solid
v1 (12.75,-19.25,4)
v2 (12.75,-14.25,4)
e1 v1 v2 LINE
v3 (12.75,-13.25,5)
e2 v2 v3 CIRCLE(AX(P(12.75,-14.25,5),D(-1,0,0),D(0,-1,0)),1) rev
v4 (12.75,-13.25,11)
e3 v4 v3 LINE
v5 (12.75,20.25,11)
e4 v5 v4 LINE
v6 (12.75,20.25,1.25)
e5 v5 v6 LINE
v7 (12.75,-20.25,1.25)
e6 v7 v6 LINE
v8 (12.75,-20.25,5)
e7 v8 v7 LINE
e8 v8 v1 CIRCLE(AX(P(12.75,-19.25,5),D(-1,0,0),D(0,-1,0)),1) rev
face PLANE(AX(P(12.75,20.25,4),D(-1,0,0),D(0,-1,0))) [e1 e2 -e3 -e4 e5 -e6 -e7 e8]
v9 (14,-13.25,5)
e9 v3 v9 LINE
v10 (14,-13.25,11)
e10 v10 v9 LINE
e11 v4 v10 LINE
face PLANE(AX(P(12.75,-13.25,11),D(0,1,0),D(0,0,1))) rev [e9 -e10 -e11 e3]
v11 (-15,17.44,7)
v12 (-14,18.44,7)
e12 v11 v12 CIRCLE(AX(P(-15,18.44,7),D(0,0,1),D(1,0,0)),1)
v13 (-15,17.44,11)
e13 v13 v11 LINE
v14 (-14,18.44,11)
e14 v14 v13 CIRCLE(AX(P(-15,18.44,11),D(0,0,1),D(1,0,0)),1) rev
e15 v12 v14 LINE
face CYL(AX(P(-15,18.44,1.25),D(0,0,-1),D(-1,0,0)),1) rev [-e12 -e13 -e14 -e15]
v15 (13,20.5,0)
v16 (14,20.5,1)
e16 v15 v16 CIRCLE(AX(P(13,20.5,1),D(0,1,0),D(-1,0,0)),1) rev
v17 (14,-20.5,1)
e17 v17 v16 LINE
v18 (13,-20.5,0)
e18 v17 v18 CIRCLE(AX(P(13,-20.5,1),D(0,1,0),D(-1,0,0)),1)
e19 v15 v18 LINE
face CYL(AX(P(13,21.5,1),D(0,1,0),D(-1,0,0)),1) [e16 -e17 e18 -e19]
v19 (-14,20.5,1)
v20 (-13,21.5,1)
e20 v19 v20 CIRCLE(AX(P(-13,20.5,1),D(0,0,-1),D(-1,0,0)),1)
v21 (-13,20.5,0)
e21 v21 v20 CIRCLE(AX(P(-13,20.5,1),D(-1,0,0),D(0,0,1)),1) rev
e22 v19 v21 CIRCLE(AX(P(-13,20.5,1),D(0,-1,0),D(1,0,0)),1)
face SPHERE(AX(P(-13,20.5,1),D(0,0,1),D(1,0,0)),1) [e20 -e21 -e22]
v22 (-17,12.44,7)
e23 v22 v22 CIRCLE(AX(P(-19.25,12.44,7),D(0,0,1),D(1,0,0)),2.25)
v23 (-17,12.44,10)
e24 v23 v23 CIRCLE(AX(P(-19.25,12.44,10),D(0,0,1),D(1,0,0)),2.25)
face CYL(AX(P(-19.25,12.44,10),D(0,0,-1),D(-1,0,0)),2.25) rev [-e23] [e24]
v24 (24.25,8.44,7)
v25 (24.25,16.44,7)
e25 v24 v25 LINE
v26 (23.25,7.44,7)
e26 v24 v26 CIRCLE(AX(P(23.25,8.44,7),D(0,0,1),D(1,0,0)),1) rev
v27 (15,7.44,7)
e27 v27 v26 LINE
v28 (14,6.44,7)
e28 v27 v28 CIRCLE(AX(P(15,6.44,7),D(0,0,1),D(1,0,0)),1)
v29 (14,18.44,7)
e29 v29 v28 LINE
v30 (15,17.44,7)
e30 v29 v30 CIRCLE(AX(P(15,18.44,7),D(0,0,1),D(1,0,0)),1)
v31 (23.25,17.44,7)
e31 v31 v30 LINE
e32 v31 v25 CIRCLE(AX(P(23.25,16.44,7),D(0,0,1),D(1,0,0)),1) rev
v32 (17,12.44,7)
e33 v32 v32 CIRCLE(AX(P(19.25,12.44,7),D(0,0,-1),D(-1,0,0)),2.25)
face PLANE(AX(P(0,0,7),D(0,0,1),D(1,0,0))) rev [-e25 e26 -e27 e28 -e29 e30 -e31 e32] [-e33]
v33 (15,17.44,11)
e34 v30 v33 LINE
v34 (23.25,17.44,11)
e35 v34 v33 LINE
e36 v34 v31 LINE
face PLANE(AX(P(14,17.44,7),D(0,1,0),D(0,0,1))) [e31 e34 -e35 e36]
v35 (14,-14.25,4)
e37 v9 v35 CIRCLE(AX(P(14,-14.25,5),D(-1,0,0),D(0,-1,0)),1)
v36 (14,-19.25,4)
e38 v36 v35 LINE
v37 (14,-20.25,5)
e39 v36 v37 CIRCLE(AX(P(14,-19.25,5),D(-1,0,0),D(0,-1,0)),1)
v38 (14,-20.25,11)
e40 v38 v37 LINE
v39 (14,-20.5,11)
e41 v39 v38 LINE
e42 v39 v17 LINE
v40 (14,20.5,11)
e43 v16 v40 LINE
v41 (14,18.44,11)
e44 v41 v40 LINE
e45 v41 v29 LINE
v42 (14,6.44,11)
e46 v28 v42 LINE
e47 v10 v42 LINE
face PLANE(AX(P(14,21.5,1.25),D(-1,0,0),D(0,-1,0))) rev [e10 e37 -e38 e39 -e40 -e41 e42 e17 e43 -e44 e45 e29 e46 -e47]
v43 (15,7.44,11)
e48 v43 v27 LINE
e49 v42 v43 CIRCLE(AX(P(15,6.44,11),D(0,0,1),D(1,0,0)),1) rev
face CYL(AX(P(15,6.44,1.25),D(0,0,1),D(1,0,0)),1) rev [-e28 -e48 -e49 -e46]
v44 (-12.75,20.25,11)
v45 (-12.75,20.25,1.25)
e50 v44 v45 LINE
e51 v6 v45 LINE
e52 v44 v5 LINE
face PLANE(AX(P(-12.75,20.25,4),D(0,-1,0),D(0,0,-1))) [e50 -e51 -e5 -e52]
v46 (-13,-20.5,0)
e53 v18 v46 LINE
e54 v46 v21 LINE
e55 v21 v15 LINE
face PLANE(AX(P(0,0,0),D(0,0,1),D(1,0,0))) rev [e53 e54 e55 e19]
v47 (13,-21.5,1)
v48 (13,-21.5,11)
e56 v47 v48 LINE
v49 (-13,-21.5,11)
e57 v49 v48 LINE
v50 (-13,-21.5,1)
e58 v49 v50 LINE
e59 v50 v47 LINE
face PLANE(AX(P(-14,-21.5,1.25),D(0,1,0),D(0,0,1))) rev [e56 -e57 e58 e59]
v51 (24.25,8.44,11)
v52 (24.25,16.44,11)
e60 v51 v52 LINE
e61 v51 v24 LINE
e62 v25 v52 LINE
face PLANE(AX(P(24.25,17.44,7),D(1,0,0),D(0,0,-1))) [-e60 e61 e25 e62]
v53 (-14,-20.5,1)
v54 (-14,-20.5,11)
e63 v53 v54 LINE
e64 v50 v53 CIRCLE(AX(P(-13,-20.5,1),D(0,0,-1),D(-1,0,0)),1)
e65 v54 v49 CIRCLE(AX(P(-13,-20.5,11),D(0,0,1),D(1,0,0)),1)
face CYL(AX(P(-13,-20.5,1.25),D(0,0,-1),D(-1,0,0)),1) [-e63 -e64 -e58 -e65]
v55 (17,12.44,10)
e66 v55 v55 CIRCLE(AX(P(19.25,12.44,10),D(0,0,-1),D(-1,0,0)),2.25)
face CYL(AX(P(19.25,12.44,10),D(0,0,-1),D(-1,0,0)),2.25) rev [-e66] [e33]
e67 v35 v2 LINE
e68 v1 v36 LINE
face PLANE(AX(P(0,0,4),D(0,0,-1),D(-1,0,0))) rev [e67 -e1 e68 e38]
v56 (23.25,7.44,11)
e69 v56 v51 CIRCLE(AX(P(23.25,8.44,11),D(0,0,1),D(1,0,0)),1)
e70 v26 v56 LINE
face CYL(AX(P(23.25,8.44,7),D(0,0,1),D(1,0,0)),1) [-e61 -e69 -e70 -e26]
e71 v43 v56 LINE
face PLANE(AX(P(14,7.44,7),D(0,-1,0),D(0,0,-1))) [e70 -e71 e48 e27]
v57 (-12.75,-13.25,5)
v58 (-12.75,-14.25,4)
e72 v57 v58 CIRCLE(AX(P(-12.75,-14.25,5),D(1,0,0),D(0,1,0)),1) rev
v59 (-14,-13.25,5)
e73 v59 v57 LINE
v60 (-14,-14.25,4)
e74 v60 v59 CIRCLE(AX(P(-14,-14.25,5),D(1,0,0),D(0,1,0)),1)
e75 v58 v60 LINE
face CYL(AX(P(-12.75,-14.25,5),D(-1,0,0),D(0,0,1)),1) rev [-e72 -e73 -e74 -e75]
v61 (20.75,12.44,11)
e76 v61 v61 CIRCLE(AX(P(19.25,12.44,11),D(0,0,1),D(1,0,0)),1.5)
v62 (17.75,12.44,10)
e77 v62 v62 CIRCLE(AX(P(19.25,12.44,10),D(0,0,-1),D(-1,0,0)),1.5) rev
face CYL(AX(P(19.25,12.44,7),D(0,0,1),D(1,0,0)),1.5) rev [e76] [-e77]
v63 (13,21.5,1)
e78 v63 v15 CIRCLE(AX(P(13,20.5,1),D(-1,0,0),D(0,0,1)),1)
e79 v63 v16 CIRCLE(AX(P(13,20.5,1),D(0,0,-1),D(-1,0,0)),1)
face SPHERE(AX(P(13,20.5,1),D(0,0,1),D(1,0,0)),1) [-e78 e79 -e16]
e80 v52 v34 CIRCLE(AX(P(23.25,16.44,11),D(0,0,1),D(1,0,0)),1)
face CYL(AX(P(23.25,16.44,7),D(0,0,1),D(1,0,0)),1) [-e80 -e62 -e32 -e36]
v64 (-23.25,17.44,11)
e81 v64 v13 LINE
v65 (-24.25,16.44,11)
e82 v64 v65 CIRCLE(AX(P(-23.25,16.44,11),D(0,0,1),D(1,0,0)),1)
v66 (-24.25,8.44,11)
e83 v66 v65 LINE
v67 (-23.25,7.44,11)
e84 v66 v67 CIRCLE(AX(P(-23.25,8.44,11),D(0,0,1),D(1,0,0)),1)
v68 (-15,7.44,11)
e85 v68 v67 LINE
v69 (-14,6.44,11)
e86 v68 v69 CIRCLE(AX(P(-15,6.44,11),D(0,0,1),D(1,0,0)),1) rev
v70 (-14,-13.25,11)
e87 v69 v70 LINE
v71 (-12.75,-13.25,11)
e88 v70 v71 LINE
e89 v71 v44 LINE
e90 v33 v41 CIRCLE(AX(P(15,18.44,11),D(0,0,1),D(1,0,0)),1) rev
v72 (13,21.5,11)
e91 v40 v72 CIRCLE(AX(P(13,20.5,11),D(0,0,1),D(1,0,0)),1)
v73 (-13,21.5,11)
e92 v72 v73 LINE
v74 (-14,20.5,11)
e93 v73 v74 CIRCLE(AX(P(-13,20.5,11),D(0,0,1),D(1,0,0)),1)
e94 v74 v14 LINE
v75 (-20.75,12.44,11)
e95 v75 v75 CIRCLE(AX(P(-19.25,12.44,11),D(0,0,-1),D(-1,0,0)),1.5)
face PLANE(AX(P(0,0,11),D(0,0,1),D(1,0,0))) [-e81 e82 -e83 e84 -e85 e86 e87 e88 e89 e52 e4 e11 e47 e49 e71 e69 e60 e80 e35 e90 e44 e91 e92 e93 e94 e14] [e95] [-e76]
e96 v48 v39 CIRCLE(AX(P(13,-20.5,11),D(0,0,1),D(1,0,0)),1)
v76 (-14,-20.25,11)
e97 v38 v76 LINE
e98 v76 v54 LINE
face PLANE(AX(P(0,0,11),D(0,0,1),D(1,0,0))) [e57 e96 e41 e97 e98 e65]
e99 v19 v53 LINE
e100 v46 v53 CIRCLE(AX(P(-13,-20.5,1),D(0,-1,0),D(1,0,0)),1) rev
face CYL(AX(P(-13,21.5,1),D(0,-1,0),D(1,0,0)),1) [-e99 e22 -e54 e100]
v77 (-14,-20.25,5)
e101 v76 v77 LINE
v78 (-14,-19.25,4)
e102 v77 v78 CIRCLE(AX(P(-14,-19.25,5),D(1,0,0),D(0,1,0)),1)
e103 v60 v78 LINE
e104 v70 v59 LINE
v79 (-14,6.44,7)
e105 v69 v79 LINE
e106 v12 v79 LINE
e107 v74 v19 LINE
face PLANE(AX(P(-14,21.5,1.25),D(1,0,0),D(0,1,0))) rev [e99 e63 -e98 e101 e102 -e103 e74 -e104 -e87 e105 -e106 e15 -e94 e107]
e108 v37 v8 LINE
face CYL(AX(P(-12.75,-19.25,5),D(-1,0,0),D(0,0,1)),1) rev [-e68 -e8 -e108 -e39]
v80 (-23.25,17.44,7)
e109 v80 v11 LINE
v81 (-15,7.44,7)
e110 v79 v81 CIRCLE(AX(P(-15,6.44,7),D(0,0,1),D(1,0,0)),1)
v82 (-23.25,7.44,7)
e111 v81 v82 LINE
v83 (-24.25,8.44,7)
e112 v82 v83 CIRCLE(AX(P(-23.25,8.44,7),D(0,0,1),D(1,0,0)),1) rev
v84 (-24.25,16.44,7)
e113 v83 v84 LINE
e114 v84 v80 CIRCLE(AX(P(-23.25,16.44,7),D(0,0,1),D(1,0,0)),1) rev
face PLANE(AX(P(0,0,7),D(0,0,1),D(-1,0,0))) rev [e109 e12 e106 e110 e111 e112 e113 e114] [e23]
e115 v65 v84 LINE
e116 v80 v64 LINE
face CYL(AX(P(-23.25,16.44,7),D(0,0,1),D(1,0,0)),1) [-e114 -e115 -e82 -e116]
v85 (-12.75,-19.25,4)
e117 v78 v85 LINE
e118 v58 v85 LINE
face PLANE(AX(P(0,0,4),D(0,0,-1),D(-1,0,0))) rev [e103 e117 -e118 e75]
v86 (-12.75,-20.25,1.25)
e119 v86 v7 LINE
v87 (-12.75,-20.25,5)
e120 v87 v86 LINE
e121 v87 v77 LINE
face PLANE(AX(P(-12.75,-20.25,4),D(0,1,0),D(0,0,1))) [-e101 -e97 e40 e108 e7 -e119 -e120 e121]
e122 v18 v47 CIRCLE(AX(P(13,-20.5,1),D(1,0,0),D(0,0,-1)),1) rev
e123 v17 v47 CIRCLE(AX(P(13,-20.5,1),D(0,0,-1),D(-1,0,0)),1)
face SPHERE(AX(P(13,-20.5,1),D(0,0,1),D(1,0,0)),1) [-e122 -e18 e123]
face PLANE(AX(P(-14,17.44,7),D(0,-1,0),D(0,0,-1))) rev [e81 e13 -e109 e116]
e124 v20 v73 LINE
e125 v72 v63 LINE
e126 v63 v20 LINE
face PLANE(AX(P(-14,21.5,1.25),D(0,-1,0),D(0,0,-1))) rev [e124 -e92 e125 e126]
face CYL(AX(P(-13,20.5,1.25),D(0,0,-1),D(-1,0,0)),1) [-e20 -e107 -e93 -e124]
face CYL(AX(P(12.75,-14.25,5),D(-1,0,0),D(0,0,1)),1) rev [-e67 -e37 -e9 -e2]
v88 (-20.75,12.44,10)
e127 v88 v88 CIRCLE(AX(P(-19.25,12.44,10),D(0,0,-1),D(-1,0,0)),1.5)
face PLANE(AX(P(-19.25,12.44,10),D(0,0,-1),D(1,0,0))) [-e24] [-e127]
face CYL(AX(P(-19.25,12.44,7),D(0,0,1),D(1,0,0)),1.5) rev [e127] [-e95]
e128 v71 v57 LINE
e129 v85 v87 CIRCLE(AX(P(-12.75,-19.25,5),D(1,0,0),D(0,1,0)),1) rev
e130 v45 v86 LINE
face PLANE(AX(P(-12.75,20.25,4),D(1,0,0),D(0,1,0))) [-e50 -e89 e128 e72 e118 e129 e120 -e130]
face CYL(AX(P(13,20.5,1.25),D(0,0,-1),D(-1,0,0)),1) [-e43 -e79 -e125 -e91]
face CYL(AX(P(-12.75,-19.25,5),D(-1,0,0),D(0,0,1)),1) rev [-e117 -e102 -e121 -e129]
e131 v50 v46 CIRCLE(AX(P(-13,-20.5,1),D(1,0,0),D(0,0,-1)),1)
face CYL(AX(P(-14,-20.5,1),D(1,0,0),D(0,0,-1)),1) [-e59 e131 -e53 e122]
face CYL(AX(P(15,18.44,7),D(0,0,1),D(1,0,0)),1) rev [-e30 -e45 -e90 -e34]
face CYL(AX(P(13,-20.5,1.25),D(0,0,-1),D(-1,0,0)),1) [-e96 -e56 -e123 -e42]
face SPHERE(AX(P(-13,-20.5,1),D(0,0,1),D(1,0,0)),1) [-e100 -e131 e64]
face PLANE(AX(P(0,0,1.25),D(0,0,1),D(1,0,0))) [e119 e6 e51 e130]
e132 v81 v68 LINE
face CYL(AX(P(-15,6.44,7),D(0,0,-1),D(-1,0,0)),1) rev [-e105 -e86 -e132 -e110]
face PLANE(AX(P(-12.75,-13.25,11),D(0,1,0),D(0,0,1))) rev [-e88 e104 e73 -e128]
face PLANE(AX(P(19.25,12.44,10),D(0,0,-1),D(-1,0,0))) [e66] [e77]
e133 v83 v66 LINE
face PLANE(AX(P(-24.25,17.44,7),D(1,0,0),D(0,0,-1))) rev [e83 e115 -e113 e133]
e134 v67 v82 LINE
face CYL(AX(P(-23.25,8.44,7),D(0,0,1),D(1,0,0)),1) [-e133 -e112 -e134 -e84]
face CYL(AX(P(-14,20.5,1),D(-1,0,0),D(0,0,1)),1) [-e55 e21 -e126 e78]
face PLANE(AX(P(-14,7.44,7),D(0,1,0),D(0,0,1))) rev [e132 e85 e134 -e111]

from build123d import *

# Parameters (mm, degrees)
SKETCH1_W             = 28
SKETCH1_H             = 43
BOSS_EXTRUDE1_DEPTH   = 1.25
SKETCH2_W             = 28
SKETCH2_H             = 43
SKETCH2_W_2           = 25.5
SKETCH2_H_2           = 40.5
BOSS_EXTRUDE2_DEPTH   = 2.75
SKETCH4_W             = 28
SKETCH4_H             = 1.25
BOSS_EXTRUDE3_DEPTH   = 7
SKETCH12_W            = 10.25
SKETCH12_H            = 10
SKETCH12_R            = 1.5
BOSS_EXTRUDE5_DEPTH   = 4
FILLET3_R             = 1
SKETCH13_R            = 2.25
CUT_EXTRUDE2_DEPTH    = 3
MIRROR1_START         = 7
MIRROR1_OUTLINE_R     = 2.25
MIRROR1_DEPTH         = 4
MIRROR1_START_2       = 10
MIRROR1_2_OUTLINE_R   = 2.25
MIRROR1_2_OUTLINE_R_2 = 1.5
MIRROR1_2_DEPTH       = 1
FILLET4_R             = 1
FILLET5_R             = 1
FILLET6_R             = 1
FILLET7_R             = 1


# Read off the part's stored shape, not the designer's step: Mirror1
with BuildPart() as part:
    # Sketch1 → Boss-Extrude1 (new body)
    with BuildSketch(Plane.XY):
        Rectangle(SKETCH1_W, SKETCH1_H)
    extrude(amount=BOSS_EXTRUDE1_DEPTH)

    # Sketch2 → Boss-Extrude2 (add)
    with BuildSketch(Plane.XY.offset(1.25)):
        Rectangle(SKETCH2_W, SKETCH2_H)
        Rectangle(SKETCH2_W_2, SKETCH2_H_2, mode=Mode.SUBTRACT)
    extrude(amount=BOSS_EXTRUDE2_DEPTH)

    # Sketch4 → Boss-Extrude3 (add)
    with BuildSketch(Plane.XY.offset(4)):
        with Locations((0, -20.875)):
            Rectangle(SKETCH4_W, SKETCH4_H)
        Polygon((12.75, -13.25), (12.75, 20.25), (-12.75, 20.25), (-12.75, -13.25), (-14, -13.25), (-14, 21.5), (14, 21.5), (14, -13.25), align=None)
    extrude(amount=BOSS_EXTRUDE3_DEPTH)

    # Sketch12 → Boss-Extrude5 (add)
    with BuildSketch(Plane.XY.offset(11)):
        with Locations((19.125, 12.44)):
            Rectangle(SKETCH12_W, SKETCH12_H)
        with Locations((19.25, 12.44)):
            Circle(SKETCH12_R, mode=Mode.SUBTRACT)
    extrude(amount=-BOSS_EXTRUDE5_DEPTH)

    # Fillet3
    fillet3_edges = [part.edges().sort_by_distance(p)[0] for p in [
        (14, 7.44, 9),
        (14, 17.44, 9),
        (24.25, 17.44, 9),
        (24.25, 7.44, 9),
    ]]
    fillet(fillet3_edges, radius=FILLET3_R)

    # Sketch13 → Cut-Extrude2 (cut)
    with BuildSketch(Plane(origin=(0, 0, 7), x_dir=(-1, 0, 0), z_dir=(0, 0, -1))):
        with Locations((-19.25, 12.44)):
            Circle(SKETCH13_R)
    extrude(amount=-CUT_EXTRUDE2_DEPTH, mode=Mode.SUBTRACT)

    # Mirror1 outline → Mirror1 (add)
    with BuildSketch(Plane.XY.offset(MIRROR1_START)):
        with BuildLine():
            Line((-14, 17.44), (-23.25, 17.44))
            ThreePointArc((-23.25, 17.44), (-23.957106781, 17.147106781), (-24.25, 16.44))
            Line((-24.25, 16.44), (-24.25, 8.44))
            ThreePointArc((-24.25, 8.44), (-23.957106781, 7.732893219), (-23.25, 7.44))
            Line((-23.25, 7.44), (-14, 7.44))
            Line((-14, 7.44), (-14, 17.44))
        make_face()
        with Locations((-19.25, 12.44)):
            Circle(MIRROR1_OUTLINE_R, mode=Mode.SUBTRACT)
    extrude(amount=MIRROR1_DEPTH)

    # Mirror1 2 outline → Mirror1 2 (add)
    with BuildSketch(Plane.XY.offset(MIRROR1_START_2)):
        with Locations((-19.25, 12.44)):
            Circle(MIRROR1_2_OUTLINE_R)
        with Locations((-19.25, 12.44)):
            Circle(MIRROR1_2_OUTLINE_R_2, mode=Mode.SUBTRACT)
    extrude(amount=MIRROR1_2_DEPTH)

    # Fillet4
    fillet4_edges = [part.edges().sort_by_distance(p)[0] for p in [
        (-13.375, -20.25, 4),
        (13.375, -13.25, 4),
        (-13.375, -13.25, 4),
        (13.375, -20.25, 4),
    ]]
    fillet(fillet4_edges, radius=FILLET4_R)

    # Fillet5
    fillet5_edges = [part.edges().sort_by_distance(p)[0] for p in [
        (0, 21.5, 0),
        (14, 0, 0),
        (0, -21.5, 0),
        (-14, 0, 0),
    ]]
    fillet(fillet5_edges, radius=FILLET5_R)

    # Fillet6
    # the kernel refuses this fillet: 1 mm, written as the material it takes off along each edge
    with BuildSketch(Plane(origin=(13, -20.5, 1), x_dir=(0, -1, 0), z_dir=(1, 0, 0))) as fillet6_piece_1_section:
        Polygon((0, 0), (FILLET6_R, 0), (FILLET6_R, FILLET6_R), (0, FILLET6_R), align=None)
    fillet6_piece_1 = extrude(amount=FILLET6_R, mode=Mode.PRIVATE)
    fillet6_piece_1 = fillet6_piece_1 - Plane(origin=(13, -20.5, 1), x_dir=(0, 0.7071067811865475, 0.7071067811865475), z_dir=(1, 0, 0)) * Sphere(FILLET6_R, mode=Mode.PRIVATE)
    add(fillet6_piece_1, mode=Mode.SUBTRACT)
    with BuildSketch(Plane(origin=(-13, -20.5, 1), x_dir=(-1, 0, 0), z_dir=(0, -1, 0))) as fillet6_piece_2_section:
        Polygon((0, 0), (FILLET6_R, 0), (FILLET6_R, FILLET6_R), (0, FILLET6_R), align=None)
    fillet6_piece_2 = extrude(amount=FILLET6_R, mode=Mode.PRIVATE)
    fillet6_piece_2 = fillet6_piece_2 - Plane(origin=(-13, -20.5, 1), x_dir=(0.7071067811865475, 0, 0.7071067811865475), z_dir=(0, -1, 0)) * Sphere(FILLET6_R, mode=Mode.PRIVATE)
    add(fillet6_piece_2, mode=Mode.SUBTRACT)
    with BuildSketch(Plane(origin=(13, 20.5, 1), x_dir=(0, 1, 0), z_dir=(1, 0, 0))) as fillet6_piece_3_section:
        Polygon((0, 0), (FILLET6_R, 0), (FILLET6_R, -FILLET6_R), (0, -FILLET6_R), align=None)
    fillet6_piece_3 = extrude(amount=FILLET6_R, mode=Mode.PRIVATE)
    fillet6_piece_3 = fillet6_piece_3 - Plane(origin=(13, 20.5, 1), x_dir=(0, -0.7071067811865475, 0.7071067811865475), z_dir=(1, 0, 0)) * Sphere(FILLET6_R, mode=Mode.PRIVATE)
    add(fillet6_piece_3, mode=Mode.SUBTRACT)
    with BuildSketch(Plane(origin=(-13, 20.5, 1), x_dir=(-1, 0, 0), z_dir=(0, 1, 0))) as fillet6_piece_4_section:
        Polygon((0, 0), (FILLET6_R, 0), (FILLET6_R, -FILLET6_R), (0, -FILLET6_R), align=None)
    fillet6_piece_4 = extrude(amount=FILLET6_R, mode=Mode.PRIVATE)
    fillet6_piece_4 = fillet6_piece_4 - Plane(origin=(-13, 20.5, 1), x_dir=(0.7071067811865475, 0, 0.7071067811865475), z_dir=(0, 1, 0)) * Sphere(FILLET6_R, mode=Mode.PRIVATE)
    add(fillet6_piece_4, mode=Mode.SUBTRACT)
    with BuildSketch(Plane(origin=(-14, 21.5, 1), x_dir=(1, 0, 0), z_dir=(0, 0, 1)), Plane(origin=(14, -21.5, 13.5), x_dir=(0, 1, 0), z_dir=(0, 0, -1))) as fillet6_piece_5:
        with BuildLine():
            CenterArc((FILLET6_R, -FILLET6_R), FILLET6_R, 90, 90)
            Line((0, -FILLET6_R), (0, 0))
            Line((0, 0), (FILLET6_R, 0))
        make_face()
    extrude(amount=12.5, mode=Mode.SUBTRACT)
    with BuildSketch(Plane(origin=(14, 21.5, 13.5), x_dir=(0, -1, 0), z_dir=(0, 0, -1)), Plane(origin=(-14, -21.5, 1), x_dir=(1, 0, 0), z_dir=(0, 0, 1))) as fillet6_piece_6:
        with BuildLine():
            CenterArc((FILLET6_R, FILLET6_R), FILLET6_R, 180, 90)
            Line((0, FILLET6_R), (0, 0))
            Line((0, 0), (FILLET6_R, 0))
        make_face()
    extrude(amount=12.5, mode=Mode.SUBTRACT)

    # Fillet7
    fillet7_edges = [part.edges().sort_by_distance(p)[0] for p in [
        (-14, 17.44, 9),
        (-14, 7.44, 9),
    ]]
    fillet(fillet7_edges, radius=FILLET7_R)


solid = part.part
